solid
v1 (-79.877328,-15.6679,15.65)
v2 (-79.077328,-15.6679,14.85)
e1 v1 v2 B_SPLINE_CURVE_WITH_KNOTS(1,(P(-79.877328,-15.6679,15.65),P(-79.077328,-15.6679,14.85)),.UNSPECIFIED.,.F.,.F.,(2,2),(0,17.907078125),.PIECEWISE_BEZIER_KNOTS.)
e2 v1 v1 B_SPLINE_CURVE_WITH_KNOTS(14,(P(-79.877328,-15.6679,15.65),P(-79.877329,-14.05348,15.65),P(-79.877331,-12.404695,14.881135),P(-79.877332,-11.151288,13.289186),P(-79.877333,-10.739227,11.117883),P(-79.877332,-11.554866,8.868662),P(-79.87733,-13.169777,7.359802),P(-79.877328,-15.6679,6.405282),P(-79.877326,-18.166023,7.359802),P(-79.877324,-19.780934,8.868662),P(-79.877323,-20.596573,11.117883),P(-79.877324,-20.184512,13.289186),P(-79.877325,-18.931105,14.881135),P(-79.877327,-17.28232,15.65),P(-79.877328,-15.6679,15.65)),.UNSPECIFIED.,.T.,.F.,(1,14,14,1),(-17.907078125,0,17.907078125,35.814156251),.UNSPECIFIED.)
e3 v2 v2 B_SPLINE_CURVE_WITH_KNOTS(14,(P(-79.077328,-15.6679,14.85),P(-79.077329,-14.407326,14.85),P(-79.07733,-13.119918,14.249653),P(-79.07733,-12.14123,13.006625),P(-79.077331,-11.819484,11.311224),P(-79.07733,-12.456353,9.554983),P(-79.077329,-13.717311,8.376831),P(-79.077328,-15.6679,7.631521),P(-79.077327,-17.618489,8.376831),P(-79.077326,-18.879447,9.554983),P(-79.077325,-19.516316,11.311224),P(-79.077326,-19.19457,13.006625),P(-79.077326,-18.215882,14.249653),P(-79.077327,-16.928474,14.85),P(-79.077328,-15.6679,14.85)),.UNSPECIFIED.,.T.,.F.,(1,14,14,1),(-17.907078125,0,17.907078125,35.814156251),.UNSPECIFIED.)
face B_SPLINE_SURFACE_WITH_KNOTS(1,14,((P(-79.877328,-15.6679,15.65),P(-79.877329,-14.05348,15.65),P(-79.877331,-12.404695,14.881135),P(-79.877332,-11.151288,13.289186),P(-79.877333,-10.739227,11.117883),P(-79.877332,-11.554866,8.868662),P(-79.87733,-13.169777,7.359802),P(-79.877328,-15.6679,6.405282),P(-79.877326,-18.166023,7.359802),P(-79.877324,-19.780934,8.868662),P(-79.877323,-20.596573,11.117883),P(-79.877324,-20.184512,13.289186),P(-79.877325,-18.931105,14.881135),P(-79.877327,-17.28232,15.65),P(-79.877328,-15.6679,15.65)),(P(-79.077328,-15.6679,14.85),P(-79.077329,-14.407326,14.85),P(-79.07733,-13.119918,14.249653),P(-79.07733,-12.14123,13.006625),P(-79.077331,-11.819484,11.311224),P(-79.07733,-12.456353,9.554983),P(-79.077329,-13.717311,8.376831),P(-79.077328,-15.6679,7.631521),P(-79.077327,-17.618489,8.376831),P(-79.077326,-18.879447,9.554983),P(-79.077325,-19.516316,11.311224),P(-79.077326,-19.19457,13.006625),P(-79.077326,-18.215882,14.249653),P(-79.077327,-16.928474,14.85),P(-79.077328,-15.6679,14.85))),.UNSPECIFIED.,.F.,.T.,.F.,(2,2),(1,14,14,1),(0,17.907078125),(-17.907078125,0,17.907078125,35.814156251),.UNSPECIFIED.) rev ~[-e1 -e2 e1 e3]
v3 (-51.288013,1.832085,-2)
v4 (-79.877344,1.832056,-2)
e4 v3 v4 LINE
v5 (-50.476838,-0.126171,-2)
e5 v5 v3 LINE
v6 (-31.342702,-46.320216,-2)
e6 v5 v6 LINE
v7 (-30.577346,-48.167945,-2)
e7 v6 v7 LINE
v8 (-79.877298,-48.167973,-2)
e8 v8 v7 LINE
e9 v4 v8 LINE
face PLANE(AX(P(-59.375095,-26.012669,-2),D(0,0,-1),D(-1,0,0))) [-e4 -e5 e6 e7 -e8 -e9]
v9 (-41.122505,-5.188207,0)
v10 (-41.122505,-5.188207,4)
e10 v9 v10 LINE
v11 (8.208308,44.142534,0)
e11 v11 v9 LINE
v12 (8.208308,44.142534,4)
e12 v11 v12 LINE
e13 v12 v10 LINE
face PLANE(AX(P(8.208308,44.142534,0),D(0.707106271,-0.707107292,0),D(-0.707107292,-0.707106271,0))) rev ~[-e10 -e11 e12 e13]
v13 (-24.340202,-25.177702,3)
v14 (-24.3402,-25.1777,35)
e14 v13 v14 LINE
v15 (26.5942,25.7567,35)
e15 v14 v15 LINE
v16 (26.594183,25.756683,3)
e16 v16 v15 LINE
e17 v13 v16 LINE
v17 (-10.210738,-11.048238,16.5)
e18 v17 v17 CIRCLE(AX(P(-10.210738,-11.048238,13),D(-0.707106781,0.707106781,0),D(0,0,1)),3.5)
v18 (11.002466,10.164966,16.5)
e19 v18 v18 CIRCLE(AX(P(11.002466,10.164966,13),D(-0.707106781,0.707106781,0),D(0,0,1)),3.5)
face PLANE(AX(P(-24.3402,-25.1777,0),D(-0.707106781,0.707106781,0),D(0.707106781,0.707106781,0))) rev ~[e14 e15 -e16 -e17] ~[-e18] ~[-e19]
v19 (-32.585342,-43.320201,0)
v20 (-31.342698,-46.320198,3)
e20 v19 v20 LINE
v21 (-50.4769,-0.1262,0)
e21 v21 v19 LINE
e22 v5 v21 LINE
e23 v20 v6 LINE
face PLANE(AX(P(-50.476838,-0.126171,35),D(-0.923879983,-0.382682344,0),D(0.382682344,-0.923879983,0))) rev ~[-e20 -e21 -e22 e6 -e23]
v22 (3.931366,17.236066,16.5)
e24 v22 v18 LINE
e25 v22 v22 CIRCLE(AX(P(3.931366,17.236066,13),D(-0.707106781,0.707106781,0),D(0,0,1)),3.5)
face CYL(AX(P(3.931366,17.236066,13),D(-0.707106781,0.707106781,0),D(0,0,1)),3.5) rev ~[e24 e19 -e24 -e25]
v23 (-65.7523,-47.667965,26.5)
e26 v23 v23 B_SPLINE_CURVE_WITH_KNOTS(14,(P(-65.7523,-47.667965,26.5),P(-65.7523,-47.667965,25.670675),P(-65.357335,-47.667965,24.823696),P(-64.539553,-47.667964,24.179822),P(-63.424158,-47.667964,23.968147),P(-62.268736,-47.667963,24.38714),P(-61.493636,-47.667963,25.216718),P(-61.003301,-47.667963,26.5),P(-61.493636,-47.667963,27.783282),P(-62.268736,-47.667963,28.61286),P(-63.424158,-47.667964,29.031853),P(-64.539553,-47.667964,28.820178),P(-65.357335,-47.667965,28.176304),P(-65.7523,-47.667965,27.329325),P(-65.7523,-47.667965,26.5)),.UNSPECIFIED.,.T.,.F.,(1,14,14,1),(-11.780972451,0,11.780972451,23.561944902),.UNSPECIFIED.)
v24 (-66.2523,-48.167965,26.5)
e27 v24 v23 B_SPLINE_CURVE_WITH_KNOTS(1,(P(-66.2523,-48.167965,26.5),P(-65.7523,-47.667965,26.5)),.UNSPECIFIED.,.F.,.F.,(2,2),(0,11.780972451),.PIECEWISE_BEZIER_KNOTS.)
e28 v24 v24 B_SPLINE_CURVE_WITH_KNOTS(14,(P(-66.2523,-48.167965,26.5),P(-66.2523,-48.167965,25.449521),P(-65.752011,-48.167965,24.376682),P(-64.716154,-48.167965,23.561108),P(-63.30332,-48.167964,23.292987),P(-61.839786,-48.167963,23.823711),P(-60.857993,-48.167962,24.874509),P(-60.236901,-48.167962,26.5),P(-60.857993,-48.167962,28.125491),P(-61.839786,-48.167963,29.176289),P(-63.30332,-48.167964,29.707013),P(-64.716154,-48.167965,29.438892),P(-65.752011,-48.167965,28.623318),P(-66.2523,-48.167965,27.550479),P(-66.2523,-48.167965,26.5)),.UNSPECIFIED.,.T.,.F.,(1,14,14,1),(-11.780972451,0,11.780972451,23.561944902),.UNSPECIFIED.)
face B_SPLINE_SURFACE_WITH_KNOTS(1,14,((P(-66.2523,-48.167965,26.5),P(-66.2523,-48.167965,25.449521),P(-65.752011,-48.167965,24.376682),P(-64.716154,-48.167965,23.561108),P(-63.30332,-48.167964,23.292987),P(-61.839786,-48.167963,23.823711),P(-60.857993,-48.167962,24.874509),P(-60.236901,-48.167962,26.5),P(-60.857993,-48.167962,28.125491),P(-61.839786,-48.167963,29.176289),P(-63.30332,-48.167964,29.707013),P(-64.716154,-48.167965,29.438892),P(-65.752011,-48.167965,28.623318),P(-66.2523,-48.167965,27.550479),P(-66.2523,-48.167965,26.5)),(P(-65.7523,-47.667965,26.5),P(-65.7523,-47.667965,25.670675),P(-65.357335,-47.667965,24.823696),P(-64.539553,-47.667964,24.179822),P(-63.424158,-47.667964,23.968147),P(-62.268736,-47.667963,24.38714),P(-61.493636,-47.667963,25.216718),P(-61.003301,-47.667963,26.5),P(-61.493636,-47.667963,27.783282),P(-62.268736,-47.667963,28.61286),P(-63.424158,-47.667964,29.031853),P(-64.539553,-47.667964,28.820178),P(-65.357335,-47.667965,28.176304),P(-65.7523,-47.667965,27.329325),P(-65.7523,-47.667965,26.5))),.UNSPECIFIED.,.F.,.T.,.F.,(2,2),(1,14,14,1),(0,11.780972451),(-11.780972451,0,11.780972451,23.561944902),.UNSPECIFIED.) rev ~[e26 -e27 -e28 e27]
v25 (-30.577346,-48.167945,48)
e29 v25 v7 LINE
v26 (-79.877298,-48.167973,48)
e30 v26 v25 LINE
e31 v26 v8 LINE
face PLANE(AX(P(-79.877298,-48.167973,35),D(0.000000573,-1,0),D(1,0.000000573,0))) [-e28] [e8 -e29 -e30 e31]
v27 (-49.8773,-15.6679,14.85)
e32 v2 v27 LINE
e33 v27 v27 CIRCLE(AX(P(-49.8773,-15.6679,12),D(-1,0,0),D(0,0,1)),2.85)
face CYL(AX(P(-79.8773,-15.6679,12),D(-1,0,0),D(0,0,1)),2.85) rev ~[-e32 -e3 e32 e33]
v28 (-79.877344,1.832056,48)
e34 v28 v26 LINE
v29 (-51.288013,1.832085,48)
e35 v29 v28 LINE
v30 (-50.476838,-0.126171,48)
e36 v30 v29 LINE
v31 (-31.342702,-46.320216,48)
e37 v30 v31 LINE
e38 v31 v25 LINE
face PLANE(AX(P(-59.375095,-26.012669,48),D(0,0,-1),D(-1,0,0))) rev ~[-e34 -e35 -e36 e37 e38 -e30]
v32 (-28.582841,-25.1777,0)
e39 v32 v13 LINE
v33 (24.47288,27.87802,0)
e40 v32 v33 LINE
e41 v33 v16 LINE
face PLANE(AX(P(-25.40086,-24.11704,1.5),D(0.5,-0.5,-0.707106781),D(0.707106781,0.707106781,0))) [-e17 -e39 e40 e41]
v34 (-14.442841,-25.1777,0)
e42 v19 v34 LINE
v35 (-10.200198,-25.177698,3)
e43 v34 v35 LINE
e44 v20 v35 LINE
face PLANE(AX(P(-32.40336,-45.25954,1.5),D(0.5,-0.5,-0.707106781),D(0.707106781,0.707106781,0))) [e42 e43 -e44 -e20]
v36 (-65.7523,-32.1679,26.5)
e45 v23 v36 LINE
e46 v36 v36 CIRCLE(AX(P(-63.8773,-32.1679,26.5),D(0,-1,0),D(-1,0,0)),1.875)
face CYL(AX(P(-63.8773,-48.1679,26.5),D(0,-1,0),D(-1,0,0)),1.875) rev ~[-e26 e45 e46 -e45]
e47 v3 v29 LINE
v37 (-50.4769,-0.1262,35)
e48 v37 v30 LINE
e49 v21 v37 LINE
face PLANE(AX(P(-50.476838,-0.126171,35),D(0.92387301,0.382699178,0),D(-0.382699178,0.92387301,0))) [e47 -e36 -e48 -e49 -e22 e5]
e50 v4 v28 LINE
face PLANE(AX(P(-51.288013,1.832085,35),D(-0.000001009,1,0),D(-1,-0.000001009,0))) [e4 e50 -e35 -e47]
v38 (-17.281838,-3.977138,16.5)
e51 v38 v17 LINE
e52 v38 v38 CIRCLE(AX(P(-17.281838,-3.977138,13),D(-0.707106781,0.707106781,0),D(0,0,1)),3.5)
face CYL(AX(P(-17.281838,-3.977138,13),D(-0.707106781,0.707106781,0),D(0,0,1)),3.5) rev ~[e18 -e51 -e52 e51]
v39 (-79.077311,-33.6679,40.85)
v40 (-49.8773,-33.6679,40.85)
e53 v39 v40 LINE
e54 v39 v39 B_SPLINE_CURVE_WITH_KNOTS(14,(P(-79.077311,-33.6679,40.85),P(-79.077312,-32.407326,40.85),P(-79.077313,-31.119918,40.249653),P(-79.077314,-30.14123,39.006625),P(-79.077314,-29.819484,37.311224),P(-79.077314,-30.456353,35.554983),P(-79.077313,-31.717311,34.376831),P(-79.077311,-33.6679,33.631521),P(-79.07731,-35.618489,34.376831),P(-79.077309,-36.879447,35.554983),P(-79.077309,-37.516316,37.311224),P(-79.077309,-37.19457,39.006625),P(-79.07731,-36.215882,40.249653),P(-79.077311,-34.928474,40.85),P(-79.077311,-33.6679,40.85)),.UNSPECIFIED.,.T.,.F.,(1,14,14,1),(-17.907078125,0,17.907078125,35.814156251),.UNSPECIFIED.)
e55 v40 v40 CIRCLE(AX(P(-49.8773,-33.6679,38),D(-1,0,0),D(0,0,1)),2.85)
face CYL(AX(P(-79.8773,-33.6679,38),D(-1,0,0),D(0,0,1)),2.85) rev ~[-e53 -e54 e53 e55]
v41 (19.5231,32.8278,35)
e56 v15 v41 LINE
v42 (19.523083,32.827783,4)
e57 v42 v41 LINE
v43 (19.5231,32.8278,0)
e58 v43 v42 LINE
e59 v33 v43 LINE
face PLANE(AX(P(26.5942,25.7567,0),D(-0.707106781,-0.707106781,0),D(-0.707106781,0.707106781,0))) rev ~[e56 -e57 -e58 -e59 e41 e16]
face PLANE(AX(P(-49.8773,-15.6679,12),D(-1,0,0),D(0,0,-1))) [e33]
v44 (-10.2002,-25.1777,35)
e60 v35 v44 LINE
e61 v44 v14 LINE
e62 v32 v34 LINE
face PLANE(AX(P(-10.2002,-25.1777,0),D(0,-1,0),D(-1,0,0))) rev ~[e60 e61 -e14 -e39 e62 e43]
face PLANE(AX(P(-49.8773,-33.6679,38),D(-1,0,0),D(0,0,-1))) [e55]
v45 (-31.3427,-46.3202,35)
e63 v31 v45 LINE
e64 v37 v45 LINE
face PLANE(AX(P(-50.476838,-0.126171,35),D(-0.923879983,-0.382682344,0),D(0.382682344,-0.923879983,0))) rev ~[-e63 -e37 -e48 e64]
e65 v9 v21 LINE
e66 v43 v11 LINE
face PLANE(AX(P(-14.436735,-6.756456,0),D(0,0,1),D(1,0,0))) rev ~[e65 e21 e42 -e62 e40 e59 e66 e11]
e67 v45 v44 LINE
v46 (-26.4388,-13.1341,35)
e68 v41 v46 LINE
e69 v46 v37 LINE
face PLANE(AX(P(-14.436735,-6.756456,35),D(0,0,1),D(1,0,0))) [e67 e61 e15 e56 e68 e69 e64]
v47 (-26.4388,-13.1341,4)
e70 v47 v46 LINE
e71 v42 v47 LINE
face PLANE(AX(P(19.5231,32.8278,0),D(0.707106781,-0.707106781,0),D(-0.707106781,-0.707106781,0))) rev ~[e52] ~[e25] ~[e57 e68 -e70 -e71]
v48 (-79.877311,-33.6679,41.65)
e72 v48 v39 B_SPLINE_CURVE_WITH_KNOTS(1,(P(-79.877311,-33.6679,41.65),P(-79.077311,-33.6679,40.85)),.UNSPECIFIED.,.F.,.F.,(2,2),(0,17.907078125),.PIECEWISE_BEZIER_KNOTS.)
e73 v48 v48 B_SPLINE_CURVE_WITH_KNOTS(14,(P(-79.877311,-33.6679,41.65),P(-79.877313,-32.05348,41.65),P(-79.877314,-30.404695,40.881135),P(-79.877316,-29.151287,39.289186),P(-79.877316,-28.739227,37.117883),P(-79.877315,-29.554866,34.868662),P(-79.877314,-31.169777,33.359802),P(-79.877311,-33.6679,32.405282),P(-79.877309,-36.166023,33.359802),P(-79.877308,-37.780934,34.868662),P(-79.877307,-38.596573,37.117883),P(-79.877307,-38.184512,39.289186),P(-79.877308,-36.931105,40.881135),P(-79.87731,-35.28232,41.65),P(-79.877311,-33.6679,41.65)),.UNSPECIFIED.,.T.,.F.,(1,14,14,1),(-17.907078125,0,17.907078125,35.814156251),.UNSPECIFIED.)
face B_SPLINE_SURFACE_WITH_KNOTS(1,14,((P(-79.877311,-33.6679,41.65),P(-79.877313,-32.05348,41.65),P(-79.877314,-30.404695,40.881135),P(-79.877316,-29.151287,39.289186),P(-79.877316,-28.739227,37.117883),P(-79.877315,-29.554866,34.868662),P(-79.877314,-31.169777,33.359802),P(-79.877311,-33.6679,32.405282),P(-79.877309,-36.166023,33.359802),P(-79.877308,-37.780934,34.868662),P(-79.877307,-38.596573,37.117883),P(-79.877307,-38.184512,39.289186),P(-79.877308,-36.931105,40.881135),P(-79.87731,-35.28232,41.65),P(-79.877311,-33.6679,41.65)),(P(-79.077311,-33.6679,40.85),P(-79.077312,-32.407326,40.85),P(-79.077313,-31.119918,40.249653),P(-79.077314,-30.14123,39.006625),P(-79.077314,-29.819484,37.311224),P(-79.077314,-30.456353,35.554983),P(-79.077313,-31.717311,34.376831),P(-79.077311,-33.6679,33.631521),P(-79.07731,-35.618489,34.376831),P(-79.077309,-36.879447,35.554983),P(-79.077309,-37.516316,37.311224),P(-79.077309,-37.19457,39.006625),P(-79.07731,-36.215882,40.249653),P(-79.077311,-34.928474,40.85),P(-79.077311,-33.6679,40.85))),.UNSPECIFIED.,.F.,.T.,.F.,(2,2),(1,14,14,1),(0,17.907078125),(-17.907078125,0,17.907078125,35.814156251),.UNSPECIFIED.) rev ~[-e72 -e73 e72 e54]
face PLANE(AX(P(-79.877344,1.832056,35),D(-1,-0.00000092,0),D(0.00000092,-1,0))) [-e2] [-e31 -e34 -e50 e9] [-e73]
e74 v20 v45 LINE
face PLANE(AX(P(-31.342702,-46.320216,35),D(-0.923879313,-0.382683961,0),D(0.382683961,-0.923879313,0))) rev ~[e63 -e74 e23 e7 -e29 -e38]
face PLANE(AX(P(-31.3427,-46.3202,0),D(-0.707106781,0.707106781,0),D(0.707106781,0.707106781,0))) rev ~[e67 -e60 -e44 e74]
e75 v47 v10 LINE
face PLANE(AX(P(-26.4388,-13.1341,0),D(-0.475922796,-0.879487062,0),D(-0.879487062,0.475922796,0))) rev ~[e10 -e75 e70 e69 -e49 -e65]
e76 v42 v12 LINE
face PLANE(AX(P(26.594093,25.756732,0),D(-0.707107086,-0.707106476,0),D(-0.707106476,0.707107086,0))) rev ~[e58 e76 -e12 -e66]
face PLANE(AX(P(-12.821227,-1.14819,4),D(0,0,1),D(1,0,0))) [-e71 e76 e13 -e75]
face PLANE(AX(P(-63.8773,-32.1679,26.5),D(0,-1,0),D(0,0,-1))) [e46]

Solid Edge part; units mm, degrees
sketch "Sketch1" plane through (0, 0, 0) normal (0, 0, 1) x (1, 0, 0)
  line L0 (-50.4769, -0.1262) -> (-31.3427, -46.3202)
  line L1 (-31.3427, -46.3202) -> (-10.2002, -25.1777)
  line L2 (-10.2002, -25.1777) -> (-24.3402, -25.1777)
  line L3 (-24.3402, -25.1777) -> (26.5942, 25.7567)
  line L4 (26.5942, 25.7567) -> (19.5231, 32.8278)
  line L5 (19.5231, 32.8278) -> (-26.4388, -13.1341)
  line L6 (-26.4388, -13.1341) -> (-50.4769, -0.1262)
  dimension "D1" = 50
  dimension "D2" = 29.9
  dimension "D3" = 10
  dimension "D4" = 65
  dimension "D5" = 14.14
  dimension "D6" = 70
extrude "Protrusion1" add sketch "Sketch1" along normal blind 35
sketch "Sketch2" plane through (-12.0121, -6.8169, 0) normal (0, 0, -1) x (-0.8794859, 0.4759249, 0)
  line L0 (-1.7996, -43.9425) -> (-10.3318, -15.2857)
  line L1 (-10.3318, -15.2857) -> (2.1041, -22.0153)
  line L2 (2.1041, -22.0153) -> (-18.451, 47.0217)
  line L3 (-18.451, 47.0217) -> (6.4693, 54.4415)
  line L4 (6.4693, 54.4415) -> (28.4484, -19.3779)
  line L5 (28.4484, -19.3779) -> (-1.7996, -43.9425)
  dimension "D1" = 36
extrude "Extrusionsausprägung_6" add sketch "Sketch2" against normal blind 4
sketch "Sketch3" plane through (-3.4579, 9.8468, 19.5) normal (-0.7071068, 0.7071068, 0) x (0, 0, 1)
  circle A0 centre (-6.5, 10.45) radius 3.5
  circle A1 centre (-6.5, -19.55) radius 3.5
  dimension "D1" = 7
  dimension "D2" = 22.05
  dimension "D3" = 13
  dimension "D4" = 30
extrude "Cutout1" cut sketch "Sketch3" against normal through all
sketch "Sketch4" plane through (-11.9413, -6.7462, 35) normal (0, 0, 1) x (0.8794859, -0.4759249, 0)
  line L0 (-37.0421, -12.5178) -> (1.771, -44.0384)
  line L1 (1.771, -44.0384) -> (3.3235, -45.2992)
  line L2 (-40.0351, -68.7623) -> (3.3235, -45.2992)
  line L3 (-63.8314, -24.788) -> (-40.0351, -68.7623)
  line L4 (-38.6875, -11.1816) -> (-63.8314, -24.788)
  line L5 (-37.0421, -12.5178) -> (-38.6875, -11.1816)
  dimension "D1" = 50
  dimension "D2" = 49.3
  dimension "D3" = 2
extrude "Extrusionsausprägung_7" add sketch "Sketch4" against normal blind 37 and the other way blind 13
chamfer "Fase_3" distance 3 angle 45 2 edges at (1.127, 0.2895, 0) (-20.7715, -35.7489, 0)
sketch "Sketch5" plane through (-55.2273, -48.1679, 23) normal (0, -1, 0) x (-1, 0, 0)
  circle A0 centre (8.65, -3.5) radius 1.875
  dimension "D1" = 3.75
  dimension "D2" = 16
  dimension "D3" = 21.5
extrude "Extrusionsausschnitt_6" cut sketch "Sketch5" against normal blind 16
chamfer "Fase_4" distance 0.5 angle 45 1 edges at (-62.0023, -48.1679, 26.5)
sketch "Sketch6" plane through (-79.8773, -23.1679, 23) normal (-1, 0, 0) x (0, 0, 1)
  circle A0 centre (-11, 7.5) radius 2.85
  circle A1 centre (15, -10.5) radius 2.85
  dimension "D1" = 5.7
  dimension "D2" = 14.5
  dimension "D3" = 10
  dimension "D4" = 26
  dimension "D5" = 18
extrude "Extrusionsausschnitt_7" cut sketch "Sketch6" against normal blind 30
chamfer "Fase_5" distance 0.8 angle 45 2 edges at (-79.8773, -15.6679, 9.15) (-79.8773, -33.6679, 35.15)
properties part number "A1.4-A" material "Nylon, allgemein"
